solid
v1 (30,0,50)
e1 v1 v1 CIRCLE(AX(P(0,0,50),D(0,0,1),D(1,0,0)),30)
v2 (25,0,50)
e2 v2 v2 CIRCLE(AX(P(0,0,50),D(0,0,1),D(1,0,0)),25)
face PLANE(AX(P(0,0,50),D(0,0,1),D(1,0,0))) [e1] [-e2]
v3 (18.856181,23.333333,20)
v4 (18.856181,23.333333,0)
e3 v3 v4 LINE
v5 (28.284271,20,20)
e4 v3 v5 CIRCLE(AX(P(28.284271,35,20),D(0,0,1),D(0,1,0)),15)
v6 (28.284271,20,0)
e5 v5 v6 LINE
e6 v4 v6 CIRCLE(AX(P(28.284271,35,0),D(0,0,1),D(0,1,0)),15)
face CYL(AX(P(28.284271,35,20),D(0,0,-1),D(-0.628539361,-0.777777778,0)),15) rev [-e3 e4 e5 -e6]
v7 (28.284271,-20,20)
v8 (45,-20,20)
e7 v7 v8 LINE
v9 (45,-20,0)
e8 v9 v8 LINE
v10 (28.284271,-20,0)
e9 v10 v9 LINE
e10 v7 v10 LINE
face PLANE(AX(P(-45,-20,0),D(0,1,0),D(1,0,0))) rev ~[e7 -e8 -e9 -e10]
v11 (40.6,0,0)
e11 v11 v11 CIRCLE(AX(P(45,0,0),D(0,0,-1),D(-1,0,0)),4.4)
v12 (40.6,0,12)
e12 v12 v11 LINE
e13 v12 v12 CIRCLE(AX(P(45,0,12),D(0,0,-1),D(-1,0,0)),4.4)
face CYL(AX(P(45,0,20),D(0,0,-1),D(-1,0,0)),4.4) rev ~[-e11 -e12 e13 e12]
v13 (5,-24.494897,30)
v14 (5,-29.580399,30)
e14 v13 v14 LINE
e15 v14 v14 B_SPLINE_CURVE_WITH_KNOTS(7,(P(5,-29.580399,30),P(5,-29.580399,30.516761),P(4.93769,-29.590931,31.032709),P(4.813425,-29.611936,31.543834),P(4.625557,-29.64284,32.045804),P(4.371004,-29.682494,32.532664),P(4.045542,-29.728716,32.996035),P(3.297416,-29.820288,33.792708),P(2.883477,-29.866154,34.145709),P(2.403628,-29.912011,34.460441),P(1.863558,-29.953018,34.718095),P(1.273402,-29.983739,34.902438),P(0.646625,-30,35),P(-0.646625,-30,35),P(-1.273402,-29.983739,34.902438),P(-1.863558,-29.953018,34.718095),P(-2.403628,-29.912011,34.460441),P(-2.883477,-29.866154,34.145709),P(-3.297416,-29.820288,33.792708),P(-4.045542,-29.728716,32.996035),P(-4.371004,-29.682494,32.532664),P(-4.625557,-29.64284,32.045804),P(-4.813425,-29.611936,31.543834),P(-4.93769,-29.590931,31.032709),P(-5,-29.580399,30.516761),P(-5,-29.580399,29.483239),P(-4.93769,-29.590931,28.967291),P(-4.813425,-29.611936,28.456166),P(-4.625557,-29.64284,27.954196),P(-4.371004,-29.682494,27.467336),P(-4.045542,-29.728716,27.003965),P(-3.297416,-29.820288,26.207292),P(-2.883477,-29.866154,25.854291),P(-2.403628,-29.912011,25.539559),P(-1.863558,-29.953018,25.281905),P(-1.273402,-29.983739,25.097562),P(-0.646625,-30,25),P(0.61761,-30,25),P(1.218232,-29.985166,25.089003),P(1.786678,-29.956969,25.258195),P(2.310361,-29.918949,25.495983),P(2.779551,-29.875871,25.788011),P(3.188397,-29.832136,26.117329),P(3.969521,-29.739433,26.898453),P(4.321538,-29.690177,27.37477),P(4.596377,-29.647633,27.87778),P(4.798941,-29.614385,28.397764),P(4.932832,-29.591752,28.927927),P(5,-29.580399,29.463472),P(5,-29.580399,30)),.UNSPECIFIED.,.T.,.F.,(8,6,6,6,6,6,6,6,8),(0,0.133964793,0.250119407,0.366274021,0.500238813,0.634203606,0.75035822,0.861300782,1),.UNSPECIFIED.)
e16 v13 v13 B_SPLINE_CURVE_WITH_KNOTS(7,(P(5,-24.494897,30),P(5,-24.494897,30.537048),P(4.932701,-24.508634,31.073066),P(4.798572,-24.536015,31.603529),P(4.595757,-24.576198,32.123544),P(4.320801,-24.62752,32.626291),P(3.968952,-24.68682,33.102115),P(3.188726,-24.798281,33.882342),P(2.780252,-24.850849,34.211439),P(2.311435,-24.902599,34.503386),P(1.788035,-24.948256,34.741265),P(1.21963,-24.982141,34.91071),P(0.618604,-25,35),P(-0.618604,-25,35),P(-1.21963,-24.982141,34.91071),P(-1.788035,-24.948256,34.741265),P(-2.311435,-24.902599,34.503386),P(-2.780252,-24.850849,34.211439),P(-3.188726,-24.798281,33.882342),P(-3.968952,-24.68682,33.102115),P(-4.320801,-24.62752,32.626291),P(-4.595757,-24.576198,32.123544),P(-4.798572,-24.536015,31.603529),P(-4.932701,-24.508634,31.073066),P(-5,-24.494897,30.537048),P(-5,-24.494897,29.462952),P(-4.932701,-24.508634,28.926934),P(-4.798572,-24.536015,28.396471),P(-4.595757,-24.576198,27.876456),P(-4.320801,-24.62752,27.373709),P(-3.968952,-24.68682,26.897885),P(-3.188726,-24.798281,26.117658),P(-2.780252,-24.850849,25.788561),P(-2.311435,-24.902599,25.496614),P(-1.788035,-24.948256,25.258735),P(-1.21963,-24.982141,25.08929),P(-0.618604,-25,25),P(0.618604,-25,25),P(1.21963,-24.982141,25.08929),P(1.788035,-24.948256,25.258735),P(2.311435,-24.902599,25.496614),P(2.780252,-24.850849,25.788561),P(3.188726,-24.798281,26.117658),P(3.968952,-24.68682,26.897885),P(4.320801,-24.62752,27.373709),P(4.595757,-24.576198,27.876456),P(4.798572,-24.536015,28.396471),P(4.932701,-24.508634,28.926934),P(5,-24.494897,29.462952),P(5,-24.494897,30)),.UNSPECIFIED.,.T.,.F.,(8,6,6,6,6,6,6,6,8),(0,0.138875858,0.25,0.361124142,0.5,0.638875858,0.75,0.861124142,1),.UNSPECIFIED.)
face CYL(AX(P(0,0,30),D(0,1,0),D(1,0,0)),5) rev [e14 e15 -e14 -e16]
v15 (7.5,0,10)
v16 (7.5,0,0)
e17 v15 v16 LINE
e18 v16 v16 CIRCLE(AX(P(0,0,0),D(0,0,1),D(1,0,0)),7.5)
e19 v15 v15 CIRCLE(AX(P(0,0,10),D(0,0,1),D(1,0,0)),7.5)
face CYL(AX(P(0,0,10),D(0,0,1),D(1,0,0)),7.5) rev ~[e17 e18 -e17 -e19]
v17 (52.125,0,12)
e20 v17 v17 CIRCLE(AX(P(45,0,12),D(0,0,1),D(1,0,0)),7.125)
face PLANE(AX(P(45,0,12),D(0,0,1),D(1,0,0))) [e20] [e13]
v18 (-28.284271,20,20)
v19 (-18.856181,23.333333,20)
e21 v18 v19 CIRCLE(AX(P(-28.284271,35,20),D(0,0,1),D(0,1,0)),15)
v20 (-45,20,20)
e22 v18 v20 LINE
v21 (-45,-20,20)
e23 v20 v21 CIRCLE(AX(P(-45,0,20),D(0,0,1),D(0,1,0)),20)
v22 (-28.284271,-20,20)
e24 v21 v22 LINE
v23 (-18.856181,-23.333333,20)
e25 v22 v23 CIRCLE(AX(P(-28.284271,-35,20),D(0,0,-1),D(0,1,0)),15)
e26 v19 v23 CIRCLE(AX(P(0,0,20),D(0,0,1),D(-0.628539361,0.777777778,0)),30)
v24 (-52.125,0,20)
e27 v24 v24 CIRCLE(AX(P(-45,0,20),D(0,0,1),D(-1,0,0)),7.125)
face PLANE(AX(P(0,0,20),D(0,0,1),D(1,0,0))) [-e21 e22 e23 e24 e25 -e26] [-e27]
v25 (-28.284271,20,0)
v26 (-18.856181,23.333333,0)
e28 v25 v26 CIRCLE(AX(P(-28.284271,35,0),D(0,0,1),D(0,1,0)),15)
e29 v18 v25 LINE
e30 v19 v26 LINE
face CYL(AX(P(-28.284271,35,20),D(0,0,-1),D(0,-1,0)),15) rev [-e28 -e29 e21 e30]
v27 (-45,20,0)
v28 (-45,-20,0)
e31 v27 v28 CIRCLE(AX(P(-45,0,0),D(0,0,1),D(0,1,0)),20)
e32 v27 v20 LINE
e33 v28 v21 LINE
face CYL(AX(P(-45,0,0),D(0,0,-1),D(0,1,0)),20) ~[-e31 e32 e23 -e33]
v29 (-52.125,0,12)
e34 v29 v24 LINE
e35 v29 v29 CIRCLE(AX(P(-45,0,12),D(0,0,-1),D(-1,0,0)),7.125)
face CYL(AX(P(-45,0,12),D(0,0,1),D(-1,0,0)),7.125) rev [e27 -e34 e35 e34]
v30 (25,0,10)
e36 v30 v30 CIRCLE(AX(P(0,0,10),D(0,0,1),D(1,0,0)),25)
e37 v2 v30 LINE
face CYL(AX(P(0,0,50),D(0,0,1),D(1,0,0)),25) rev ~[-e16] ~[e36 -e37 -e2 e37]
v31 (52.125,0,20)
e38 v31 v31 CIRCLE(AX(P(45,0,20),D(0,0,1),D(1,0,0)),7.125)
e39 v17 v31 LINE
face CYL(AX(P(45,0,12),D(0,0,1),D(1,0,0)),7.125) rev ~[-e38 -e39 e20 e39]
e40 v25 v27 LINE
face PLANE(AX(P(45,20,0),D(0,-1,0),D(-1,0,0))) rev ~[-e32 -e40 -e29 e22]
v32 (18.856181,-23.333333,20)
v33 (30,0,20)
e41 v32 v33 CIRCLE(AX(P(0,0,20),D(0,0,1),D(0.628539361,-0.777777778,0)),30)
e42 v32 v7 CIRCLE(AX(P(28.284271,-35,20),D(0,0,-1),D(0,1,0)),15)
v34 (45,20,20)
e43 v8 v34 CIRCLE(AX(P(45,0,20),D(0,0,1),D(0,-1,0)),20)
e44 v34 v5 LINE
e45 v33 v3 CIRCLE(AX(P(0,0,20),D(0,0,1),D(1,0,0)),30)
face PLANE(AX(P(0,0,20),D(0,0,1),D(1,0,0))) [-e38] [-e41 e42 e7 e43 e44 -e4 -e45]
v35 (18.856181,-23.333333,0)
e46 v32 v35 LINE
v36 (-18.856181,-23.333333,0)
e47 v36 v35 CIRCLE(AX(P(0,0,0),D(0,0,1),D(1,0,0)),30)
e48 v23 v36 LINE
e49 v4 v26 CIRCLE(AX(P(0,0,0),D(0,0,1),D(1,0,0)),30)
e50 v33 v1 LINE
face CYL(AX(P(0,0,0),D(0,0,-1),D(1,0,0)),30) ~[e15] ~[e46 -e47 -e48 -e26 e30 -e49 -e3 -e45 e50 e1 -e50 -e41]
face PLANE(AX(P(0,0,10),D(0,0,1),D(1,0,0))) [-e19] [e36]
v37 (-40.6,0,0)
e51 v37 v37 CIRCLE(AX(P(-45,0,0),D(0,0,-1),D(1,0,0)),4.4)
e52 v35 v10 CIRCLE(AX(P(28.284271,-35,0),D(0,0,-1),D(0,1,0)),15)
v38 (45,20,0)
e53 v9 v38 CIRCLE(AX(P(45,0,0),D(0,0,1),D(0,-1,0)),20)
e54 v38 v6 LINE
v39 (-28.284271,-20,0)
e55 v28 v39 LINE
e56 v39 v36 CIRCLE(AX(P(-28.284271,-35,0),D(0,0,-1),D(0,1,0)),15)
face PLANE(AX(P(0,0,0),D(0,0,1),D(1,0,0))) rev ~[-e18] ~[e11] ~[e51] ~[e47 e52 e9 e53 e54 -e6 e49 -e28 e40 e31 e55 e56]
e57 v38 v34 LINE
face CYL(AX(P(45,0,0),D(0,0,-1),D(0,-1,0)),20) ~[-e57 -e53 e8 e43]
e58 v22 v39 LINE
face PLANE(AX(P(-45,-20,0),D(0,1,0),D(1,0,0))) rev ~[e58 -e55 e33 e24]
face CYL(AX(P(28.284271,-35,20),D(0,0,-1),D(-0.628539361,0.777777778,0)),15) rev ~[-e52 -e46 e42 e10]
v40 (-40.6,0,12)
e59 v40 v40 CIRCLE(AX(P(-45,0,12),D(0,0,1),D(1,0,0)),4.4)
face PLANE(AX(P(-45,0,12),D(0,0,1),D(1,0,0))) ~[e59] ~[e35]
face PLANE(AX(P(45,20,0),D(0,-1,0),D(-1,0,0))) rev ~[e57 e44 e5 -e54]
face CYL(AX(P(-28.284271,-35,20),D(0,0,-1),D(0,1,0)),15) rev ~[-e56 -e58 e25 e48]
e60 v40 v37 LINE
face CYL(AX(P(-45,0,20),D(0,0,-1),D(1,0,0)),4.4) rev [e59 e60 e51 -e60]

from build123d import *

# Parameters (mm, degrees)
F1_DEPTH       = 20
F2_R           = 30
F3_DEPTH       = 50
F4_R           = 25
F5_DEPTH       = 40
F7_D           = 8.8
F7_CBORE_D     = 14.25
F7_CBORE_DEPTH = 8
F8_R           = 5
F9_DEPTH       = 30.001
F10_R          = 7.5
F11_DEPTH      = 10
F12_R          = 15


# Not quite as in the source:
# - a pattern or mirror of a feature is missing from the dataset's text; its kind, count and spacing are read off the source's solid


with BuildPart() as f1:
    # F0 (on Top) → F1 (new body)
    with BuildSketch(Plane.XY):
        with BuildLine():
            Line((-45, -20), (45, -20))
            ThreePointArc((45, -20), (65, 0), (45, 20))
            Line((45, 20), (-45, 20))
            ThreePointArc((-45, 20), (-65, 0), (-45, -20))
        make_face()
    extrude(amount=F1_DEPTH)

    # F2 (on Top) → F3 (join)
    with BuildSketch(Plane.XY):
        Circle(F2_R)
    extrude(amount=F3_DEPTH)

    # F4 (on face) → F5 (cut)
    with BuildSketch(Plane.XY.offset(50)):
        Circle(F4_R)
    extrude(amount=-F5_DEPTH, mode=Mode.SUBTRACT)

    # F7 (through all)
    with Locations(Plane.XY.offset(20)):
        with Locations((45, 0)):
            f7 = CounterBoreHole(F7_D / 2, F7_CBORE_D / 2, F7_CBORE_DEPTH)

    # F7_copies: F7 across plane
    add(f7.mirror(Plane(origin=(0, 0, 0), x_dir=(0, 0, -1), z_dir=(-1, 0, 0))), mode=Mode.SUBTRACT)

    # F8 (on Front) → F9 (cut, through all)
    with BuildSketch(Plane.XZ):
        with Locations((0, 30)):
            Circle(F8_R)
    extrude(amount=F9_DEPTH, mode=Mode.SUBTRACT)

    # F10 (on face) → F11 (cut, through all)
    with BuildSketch(Plane.XY.offset(10)):
        Circle(F10_R)
    extrude(amount=-F11_DEPTH, mode=Mode.SUBTRACT)

    # F12
    f12_edges = [f1.edges().sort_by_distance(p)[0] for p in [
        (-22.36068, -20, 10),
        (22.36068, -20, 10),
        (-22.36068, 20, 10),
        (22.36068, 20, 10),
    ]]
    fillet(f12_edges, radius=F12_R)


solid = f1.part
